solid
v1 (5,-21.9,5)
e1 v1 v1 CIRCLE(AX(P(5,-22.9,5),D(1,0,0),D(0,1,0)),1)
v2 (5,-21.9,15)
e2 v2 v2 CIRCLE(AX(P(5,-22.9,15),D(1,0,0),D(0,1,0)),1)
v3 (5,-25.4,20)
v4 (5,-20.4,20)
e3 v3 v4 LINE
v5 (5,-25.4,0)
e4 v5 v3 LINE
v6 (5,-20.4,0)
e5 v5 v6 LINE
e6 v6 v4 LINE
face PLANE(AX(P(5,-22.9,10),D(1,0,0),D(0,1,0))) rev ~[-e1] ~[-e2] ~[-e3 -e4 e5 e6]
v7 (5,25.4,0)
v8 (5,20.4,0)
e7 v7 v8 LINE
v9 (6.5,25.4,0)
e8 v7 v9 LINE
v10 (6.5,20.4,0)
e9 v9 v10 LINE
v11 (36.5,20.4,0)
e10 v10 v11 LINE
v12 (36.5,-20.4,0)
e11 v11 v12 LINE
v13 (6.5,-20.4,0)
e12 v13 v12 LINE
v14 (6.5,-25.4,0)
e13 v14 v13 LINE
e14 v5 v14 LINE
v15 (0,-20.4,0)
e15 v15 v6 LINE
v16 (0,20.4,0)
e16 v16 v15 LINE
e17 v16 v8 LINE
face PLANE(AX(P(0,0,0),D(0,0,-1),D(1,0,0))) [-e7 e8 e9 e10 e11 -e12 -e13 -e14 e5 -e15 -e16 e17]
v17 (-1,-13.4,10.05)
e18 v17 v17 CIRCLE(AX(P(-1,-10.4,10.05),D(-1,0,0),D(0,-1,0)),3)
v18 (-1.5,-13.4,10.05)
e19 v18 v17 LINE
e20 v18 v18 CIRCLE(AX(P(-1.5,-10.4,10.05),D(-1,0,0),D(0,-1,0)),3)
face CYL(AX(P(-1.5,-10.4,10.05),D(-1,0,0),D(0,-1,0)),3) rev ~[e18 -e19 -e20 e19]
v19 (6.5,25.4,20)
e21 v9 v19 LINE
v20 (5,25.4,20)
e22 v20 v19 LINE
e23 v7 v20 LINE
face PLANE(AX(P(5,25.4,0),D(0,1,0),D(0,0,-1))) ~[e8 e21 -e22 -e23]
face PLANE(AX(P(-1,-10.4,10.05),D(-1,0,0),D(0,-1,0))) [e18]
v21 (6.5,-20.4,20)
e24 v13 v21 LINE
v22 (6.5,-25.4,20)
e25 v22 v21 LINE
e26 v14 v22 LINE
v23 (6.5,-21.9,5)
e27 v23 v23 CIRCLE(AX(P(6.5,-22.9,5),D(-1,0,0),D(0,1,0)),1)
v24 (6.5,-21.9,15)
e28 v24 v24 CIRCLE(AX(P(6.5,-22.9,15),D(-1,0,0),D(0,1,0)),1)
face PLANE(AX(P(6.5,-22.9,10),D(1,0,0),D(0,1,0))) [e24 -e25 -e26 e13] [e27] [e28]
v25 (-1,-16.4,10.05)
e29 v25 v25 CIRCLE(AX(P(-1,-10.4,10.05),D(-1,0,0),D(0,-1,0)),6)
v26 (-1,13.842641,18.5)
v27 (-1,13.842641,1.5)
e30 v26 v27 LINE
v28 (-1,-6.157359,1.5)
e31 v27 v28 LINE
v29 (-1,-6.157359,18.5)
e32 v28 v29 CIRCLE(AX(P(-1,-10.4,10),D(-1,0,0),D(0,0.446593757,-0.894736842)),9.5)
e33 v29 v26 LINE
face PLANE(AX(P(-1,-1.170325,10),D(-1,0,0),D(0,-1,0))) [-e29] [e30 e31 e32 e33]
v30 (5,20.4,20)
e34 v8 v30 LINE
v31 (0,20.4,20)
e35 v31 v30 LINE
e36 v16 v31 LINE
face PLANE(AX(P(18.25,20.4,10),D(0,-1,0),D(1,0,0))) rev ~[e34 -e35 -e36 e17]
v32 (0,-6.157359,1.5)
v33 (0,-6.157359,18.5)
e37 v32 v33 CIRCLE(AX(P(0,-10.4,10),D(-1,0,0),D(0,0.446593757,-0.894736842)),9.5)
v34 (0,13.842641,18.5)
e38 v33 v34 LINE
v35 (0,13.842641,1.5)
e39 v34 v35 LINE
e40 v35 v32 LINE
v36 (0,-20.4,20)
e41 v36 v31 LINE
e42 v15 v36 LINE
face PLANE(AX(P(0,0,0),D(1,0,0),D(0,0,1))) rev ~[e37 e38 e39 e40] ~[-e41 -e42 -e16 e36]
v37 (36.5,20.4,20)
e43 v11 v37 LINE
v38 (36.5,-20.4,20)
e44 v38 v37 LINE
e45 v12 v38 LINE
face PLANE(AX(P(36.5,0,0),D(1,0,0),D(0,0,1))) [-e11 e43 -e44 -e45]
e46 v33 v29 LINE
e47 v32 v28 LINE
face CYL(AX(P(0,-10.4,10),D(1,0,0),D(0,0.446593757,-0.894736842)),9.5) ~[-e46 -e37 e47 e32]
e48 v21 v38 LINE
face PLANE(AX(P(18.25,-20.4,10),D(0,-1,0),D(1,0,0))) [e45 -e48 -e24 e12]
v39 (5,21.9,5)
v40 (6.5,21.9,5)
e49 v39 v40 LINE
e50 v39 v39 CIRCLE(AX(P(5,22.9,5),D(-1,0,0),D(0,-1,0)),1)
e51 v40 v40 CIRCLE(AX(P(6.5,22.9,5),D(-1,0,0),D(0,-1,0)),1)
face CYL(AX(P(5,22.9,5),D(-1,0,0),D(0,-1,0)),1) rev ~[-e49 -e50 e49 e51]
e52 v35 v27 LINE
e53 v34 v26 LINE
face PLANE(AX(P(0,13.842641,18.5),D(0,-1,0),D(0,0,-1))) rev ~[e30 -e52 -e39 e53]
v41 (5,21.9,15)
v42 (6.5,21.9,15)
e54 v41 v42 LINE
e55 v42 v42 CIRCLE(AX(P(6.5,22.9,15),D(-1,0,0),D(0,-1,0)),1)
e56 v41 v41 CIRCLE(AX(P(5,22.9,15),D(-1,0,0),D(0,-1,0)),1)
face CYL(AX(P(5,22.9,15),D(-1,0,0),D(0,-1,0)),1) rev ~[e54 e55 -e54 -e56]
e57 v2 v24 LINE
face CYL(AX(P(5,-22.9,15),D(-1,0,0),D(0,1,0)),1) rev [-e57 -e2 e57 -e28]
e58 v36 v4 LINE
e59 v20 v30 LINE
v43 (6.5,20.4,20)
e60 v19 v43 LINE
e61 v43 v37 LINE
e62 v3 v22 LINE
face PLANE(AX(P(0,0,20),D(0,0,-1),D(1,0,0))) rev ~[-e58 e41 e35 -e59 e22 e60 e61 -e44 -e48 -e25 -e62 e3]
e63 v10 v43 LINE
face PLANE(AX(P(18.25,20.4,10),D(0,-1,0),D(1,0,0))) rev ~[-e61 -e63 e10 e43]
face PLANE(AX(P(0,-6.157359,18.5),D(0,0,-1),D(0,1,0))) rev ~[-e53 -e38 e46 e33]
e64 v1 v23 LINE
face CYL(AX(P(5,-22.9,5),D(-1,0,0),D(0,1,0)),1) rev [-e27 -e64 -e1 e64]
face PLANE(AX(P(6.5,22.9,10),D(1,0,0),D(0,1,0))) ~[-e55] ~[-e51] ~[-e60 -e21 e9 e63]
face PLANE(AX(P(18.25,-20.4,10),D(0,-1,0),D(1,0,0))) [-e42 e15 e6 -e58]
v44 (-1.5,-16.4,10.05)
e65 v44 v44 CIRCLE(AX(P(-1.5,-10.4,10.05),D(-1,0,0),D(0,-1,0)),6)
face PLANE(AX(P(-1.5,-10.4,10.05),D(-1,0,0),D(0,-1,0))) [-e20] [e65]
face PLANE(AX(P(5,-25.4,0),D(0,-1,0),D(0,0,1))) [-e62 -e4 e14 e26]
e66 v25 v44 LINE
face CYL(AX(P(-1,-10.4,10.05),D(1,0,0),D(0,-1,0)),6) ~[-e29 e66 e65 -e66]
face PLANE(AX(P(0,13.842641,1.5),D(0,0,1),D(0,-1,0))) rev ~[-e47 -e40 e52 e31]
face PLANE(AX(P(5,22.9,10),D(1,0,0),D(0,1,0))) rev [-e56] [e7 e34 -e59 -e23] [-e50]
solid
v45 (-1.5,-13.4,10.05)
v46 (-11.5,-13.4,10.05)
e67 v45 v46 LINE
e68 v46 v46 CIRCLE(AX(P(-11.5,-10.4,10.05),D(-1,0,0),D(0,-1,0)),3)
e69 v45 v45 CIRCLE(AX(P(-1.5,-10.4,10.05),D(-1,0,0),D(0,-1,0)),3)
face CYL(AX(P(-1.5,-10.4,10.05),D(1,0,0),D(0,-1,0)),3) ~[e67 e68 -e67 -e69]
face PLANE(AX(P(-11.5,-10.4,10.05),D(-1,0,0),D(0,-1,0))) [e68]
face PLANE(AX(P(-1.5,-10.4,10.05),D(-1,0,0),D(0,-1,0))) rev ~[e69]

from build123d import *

# Parameters (mm, degrees)
F0_W      = 36.5
F0_H      = 20
F1_DEPTH  = 20.4
F3_W      = 5
F3_H      = 20
F4_DEPTH  = 1.5
F7_DEPTH  = 1
F8_R      = 6
F9_DEPTH  = 0.5
F10_R     = 3
F11_DEPTH = 0.5
F12_R     = 3
F13_DEPTH = 10
F14_R     = 1
F15_DEPTH = 25


# Not quite as in the source:
# - a pattern or mirror of a feature is missing from the dataset's text; its kind, count and spacing are read off the source's solid


with BuildPart() as f1:
    # F0 (on Front) → F1 (new body, symmetric)
    with BuildSketch(Plane.XZ):
        with Locations((18.25, 10)):
            Rectangle(F0_W, F0_H)
    extrude(amount=F1_DEPTH, both=True)

    # F3 (on offset) → F4 (join)
    with BuildSketch(Plane.YZ.offset(5)):
        with Locations((-22.9, 10)):
            Rectangle(F3_W, F3_H)
    extrude(amount=F4_DEPTH)


with BuildPart() as f5_1:
    # F5: instance of F1
    add(f1.part.mirror(Plane.XZ))


with BuildPart() as f1_1:
    add(f1.part)

    add(f5_1.part)  # F7 merges F5_1
    # F6 (on face) → F7 (join)
    with BuildSketch(Plane(origin=(0, 0, 0), x_dir=(0, -1, 0), z_dir=(-1, 0, 0))):
        with BuildLine():
            Line((-13.8426406871, 1.5), (6.1573593129, 1.5))
            ThreePointArc((6.1573593129, 1.5), (19.9, 10), (6.1573593129, 18.5))
            Line((6.1573593129, 18.5), (-13.8426406871, 18.5))
            Line((-13.8426406871, 18.5), (-13.8426406871, 1.5))
        make_face()
    extrude(amount=F7_DEPTH)

    # F8 (on face) → F9 (join)
    with BuildSketch(Plane(origin=(-1, 0, 0), x_dir=(0, -1, 0), z_dir=(-1, 0, 0))):
        with Locations((10.4, 10.05)):
            Circle(F8_R)
    extrude(amount=F9_DEPTH)

    # F10 (on face) → F11 (cut)
    with BuildSketch(Plane(origin=(-1.5, 0, 0), x_dir=(0, -1, 0), z_dir=(-1, 0, 0))):
        with Locations((10.4, 10.05)):
            Circle(F10_R)
    extrude(amount=-F11_DEPTH, mode=Mode.SUBTRACT)

    # F14 (on face) → F15 (cut)
    with BuildSketch(Plane(origin=(5, 0, 0), x_dir=(0, -1, 0), z_dir=(-1, 0, 0))):
        with Locations((-22.9, 5)):
            Circle(F14_R)
        with Locations((-22.9, 15)):
            Circle(F14_R)
    f15 = extrude(amount=-F15_DEPTH, mode=Mode.SUBTRACT)

    # F15_copies: F15 across plane
    add(f15.mirror(Plane(origin=(0, 0, 0), x_dir=(0, 0, -1), z_dir=(0, -1, 0))), mode=Mode.SUBTRACT)


with BuildPart() as f13:
    # F12 (on face) → F13 (new body)
    with BuildSketch(Plane(origin=(-1.5, 0, 0), x_dir=(0, -1, 0), z_dir=(-1, 0, 0))):
        with Locations((10.4, 10.05)):
            Circle(F12_R)
    extrude(amount=F13_DEPTH)


solid = Compound([f1_1.part, f13.part])
